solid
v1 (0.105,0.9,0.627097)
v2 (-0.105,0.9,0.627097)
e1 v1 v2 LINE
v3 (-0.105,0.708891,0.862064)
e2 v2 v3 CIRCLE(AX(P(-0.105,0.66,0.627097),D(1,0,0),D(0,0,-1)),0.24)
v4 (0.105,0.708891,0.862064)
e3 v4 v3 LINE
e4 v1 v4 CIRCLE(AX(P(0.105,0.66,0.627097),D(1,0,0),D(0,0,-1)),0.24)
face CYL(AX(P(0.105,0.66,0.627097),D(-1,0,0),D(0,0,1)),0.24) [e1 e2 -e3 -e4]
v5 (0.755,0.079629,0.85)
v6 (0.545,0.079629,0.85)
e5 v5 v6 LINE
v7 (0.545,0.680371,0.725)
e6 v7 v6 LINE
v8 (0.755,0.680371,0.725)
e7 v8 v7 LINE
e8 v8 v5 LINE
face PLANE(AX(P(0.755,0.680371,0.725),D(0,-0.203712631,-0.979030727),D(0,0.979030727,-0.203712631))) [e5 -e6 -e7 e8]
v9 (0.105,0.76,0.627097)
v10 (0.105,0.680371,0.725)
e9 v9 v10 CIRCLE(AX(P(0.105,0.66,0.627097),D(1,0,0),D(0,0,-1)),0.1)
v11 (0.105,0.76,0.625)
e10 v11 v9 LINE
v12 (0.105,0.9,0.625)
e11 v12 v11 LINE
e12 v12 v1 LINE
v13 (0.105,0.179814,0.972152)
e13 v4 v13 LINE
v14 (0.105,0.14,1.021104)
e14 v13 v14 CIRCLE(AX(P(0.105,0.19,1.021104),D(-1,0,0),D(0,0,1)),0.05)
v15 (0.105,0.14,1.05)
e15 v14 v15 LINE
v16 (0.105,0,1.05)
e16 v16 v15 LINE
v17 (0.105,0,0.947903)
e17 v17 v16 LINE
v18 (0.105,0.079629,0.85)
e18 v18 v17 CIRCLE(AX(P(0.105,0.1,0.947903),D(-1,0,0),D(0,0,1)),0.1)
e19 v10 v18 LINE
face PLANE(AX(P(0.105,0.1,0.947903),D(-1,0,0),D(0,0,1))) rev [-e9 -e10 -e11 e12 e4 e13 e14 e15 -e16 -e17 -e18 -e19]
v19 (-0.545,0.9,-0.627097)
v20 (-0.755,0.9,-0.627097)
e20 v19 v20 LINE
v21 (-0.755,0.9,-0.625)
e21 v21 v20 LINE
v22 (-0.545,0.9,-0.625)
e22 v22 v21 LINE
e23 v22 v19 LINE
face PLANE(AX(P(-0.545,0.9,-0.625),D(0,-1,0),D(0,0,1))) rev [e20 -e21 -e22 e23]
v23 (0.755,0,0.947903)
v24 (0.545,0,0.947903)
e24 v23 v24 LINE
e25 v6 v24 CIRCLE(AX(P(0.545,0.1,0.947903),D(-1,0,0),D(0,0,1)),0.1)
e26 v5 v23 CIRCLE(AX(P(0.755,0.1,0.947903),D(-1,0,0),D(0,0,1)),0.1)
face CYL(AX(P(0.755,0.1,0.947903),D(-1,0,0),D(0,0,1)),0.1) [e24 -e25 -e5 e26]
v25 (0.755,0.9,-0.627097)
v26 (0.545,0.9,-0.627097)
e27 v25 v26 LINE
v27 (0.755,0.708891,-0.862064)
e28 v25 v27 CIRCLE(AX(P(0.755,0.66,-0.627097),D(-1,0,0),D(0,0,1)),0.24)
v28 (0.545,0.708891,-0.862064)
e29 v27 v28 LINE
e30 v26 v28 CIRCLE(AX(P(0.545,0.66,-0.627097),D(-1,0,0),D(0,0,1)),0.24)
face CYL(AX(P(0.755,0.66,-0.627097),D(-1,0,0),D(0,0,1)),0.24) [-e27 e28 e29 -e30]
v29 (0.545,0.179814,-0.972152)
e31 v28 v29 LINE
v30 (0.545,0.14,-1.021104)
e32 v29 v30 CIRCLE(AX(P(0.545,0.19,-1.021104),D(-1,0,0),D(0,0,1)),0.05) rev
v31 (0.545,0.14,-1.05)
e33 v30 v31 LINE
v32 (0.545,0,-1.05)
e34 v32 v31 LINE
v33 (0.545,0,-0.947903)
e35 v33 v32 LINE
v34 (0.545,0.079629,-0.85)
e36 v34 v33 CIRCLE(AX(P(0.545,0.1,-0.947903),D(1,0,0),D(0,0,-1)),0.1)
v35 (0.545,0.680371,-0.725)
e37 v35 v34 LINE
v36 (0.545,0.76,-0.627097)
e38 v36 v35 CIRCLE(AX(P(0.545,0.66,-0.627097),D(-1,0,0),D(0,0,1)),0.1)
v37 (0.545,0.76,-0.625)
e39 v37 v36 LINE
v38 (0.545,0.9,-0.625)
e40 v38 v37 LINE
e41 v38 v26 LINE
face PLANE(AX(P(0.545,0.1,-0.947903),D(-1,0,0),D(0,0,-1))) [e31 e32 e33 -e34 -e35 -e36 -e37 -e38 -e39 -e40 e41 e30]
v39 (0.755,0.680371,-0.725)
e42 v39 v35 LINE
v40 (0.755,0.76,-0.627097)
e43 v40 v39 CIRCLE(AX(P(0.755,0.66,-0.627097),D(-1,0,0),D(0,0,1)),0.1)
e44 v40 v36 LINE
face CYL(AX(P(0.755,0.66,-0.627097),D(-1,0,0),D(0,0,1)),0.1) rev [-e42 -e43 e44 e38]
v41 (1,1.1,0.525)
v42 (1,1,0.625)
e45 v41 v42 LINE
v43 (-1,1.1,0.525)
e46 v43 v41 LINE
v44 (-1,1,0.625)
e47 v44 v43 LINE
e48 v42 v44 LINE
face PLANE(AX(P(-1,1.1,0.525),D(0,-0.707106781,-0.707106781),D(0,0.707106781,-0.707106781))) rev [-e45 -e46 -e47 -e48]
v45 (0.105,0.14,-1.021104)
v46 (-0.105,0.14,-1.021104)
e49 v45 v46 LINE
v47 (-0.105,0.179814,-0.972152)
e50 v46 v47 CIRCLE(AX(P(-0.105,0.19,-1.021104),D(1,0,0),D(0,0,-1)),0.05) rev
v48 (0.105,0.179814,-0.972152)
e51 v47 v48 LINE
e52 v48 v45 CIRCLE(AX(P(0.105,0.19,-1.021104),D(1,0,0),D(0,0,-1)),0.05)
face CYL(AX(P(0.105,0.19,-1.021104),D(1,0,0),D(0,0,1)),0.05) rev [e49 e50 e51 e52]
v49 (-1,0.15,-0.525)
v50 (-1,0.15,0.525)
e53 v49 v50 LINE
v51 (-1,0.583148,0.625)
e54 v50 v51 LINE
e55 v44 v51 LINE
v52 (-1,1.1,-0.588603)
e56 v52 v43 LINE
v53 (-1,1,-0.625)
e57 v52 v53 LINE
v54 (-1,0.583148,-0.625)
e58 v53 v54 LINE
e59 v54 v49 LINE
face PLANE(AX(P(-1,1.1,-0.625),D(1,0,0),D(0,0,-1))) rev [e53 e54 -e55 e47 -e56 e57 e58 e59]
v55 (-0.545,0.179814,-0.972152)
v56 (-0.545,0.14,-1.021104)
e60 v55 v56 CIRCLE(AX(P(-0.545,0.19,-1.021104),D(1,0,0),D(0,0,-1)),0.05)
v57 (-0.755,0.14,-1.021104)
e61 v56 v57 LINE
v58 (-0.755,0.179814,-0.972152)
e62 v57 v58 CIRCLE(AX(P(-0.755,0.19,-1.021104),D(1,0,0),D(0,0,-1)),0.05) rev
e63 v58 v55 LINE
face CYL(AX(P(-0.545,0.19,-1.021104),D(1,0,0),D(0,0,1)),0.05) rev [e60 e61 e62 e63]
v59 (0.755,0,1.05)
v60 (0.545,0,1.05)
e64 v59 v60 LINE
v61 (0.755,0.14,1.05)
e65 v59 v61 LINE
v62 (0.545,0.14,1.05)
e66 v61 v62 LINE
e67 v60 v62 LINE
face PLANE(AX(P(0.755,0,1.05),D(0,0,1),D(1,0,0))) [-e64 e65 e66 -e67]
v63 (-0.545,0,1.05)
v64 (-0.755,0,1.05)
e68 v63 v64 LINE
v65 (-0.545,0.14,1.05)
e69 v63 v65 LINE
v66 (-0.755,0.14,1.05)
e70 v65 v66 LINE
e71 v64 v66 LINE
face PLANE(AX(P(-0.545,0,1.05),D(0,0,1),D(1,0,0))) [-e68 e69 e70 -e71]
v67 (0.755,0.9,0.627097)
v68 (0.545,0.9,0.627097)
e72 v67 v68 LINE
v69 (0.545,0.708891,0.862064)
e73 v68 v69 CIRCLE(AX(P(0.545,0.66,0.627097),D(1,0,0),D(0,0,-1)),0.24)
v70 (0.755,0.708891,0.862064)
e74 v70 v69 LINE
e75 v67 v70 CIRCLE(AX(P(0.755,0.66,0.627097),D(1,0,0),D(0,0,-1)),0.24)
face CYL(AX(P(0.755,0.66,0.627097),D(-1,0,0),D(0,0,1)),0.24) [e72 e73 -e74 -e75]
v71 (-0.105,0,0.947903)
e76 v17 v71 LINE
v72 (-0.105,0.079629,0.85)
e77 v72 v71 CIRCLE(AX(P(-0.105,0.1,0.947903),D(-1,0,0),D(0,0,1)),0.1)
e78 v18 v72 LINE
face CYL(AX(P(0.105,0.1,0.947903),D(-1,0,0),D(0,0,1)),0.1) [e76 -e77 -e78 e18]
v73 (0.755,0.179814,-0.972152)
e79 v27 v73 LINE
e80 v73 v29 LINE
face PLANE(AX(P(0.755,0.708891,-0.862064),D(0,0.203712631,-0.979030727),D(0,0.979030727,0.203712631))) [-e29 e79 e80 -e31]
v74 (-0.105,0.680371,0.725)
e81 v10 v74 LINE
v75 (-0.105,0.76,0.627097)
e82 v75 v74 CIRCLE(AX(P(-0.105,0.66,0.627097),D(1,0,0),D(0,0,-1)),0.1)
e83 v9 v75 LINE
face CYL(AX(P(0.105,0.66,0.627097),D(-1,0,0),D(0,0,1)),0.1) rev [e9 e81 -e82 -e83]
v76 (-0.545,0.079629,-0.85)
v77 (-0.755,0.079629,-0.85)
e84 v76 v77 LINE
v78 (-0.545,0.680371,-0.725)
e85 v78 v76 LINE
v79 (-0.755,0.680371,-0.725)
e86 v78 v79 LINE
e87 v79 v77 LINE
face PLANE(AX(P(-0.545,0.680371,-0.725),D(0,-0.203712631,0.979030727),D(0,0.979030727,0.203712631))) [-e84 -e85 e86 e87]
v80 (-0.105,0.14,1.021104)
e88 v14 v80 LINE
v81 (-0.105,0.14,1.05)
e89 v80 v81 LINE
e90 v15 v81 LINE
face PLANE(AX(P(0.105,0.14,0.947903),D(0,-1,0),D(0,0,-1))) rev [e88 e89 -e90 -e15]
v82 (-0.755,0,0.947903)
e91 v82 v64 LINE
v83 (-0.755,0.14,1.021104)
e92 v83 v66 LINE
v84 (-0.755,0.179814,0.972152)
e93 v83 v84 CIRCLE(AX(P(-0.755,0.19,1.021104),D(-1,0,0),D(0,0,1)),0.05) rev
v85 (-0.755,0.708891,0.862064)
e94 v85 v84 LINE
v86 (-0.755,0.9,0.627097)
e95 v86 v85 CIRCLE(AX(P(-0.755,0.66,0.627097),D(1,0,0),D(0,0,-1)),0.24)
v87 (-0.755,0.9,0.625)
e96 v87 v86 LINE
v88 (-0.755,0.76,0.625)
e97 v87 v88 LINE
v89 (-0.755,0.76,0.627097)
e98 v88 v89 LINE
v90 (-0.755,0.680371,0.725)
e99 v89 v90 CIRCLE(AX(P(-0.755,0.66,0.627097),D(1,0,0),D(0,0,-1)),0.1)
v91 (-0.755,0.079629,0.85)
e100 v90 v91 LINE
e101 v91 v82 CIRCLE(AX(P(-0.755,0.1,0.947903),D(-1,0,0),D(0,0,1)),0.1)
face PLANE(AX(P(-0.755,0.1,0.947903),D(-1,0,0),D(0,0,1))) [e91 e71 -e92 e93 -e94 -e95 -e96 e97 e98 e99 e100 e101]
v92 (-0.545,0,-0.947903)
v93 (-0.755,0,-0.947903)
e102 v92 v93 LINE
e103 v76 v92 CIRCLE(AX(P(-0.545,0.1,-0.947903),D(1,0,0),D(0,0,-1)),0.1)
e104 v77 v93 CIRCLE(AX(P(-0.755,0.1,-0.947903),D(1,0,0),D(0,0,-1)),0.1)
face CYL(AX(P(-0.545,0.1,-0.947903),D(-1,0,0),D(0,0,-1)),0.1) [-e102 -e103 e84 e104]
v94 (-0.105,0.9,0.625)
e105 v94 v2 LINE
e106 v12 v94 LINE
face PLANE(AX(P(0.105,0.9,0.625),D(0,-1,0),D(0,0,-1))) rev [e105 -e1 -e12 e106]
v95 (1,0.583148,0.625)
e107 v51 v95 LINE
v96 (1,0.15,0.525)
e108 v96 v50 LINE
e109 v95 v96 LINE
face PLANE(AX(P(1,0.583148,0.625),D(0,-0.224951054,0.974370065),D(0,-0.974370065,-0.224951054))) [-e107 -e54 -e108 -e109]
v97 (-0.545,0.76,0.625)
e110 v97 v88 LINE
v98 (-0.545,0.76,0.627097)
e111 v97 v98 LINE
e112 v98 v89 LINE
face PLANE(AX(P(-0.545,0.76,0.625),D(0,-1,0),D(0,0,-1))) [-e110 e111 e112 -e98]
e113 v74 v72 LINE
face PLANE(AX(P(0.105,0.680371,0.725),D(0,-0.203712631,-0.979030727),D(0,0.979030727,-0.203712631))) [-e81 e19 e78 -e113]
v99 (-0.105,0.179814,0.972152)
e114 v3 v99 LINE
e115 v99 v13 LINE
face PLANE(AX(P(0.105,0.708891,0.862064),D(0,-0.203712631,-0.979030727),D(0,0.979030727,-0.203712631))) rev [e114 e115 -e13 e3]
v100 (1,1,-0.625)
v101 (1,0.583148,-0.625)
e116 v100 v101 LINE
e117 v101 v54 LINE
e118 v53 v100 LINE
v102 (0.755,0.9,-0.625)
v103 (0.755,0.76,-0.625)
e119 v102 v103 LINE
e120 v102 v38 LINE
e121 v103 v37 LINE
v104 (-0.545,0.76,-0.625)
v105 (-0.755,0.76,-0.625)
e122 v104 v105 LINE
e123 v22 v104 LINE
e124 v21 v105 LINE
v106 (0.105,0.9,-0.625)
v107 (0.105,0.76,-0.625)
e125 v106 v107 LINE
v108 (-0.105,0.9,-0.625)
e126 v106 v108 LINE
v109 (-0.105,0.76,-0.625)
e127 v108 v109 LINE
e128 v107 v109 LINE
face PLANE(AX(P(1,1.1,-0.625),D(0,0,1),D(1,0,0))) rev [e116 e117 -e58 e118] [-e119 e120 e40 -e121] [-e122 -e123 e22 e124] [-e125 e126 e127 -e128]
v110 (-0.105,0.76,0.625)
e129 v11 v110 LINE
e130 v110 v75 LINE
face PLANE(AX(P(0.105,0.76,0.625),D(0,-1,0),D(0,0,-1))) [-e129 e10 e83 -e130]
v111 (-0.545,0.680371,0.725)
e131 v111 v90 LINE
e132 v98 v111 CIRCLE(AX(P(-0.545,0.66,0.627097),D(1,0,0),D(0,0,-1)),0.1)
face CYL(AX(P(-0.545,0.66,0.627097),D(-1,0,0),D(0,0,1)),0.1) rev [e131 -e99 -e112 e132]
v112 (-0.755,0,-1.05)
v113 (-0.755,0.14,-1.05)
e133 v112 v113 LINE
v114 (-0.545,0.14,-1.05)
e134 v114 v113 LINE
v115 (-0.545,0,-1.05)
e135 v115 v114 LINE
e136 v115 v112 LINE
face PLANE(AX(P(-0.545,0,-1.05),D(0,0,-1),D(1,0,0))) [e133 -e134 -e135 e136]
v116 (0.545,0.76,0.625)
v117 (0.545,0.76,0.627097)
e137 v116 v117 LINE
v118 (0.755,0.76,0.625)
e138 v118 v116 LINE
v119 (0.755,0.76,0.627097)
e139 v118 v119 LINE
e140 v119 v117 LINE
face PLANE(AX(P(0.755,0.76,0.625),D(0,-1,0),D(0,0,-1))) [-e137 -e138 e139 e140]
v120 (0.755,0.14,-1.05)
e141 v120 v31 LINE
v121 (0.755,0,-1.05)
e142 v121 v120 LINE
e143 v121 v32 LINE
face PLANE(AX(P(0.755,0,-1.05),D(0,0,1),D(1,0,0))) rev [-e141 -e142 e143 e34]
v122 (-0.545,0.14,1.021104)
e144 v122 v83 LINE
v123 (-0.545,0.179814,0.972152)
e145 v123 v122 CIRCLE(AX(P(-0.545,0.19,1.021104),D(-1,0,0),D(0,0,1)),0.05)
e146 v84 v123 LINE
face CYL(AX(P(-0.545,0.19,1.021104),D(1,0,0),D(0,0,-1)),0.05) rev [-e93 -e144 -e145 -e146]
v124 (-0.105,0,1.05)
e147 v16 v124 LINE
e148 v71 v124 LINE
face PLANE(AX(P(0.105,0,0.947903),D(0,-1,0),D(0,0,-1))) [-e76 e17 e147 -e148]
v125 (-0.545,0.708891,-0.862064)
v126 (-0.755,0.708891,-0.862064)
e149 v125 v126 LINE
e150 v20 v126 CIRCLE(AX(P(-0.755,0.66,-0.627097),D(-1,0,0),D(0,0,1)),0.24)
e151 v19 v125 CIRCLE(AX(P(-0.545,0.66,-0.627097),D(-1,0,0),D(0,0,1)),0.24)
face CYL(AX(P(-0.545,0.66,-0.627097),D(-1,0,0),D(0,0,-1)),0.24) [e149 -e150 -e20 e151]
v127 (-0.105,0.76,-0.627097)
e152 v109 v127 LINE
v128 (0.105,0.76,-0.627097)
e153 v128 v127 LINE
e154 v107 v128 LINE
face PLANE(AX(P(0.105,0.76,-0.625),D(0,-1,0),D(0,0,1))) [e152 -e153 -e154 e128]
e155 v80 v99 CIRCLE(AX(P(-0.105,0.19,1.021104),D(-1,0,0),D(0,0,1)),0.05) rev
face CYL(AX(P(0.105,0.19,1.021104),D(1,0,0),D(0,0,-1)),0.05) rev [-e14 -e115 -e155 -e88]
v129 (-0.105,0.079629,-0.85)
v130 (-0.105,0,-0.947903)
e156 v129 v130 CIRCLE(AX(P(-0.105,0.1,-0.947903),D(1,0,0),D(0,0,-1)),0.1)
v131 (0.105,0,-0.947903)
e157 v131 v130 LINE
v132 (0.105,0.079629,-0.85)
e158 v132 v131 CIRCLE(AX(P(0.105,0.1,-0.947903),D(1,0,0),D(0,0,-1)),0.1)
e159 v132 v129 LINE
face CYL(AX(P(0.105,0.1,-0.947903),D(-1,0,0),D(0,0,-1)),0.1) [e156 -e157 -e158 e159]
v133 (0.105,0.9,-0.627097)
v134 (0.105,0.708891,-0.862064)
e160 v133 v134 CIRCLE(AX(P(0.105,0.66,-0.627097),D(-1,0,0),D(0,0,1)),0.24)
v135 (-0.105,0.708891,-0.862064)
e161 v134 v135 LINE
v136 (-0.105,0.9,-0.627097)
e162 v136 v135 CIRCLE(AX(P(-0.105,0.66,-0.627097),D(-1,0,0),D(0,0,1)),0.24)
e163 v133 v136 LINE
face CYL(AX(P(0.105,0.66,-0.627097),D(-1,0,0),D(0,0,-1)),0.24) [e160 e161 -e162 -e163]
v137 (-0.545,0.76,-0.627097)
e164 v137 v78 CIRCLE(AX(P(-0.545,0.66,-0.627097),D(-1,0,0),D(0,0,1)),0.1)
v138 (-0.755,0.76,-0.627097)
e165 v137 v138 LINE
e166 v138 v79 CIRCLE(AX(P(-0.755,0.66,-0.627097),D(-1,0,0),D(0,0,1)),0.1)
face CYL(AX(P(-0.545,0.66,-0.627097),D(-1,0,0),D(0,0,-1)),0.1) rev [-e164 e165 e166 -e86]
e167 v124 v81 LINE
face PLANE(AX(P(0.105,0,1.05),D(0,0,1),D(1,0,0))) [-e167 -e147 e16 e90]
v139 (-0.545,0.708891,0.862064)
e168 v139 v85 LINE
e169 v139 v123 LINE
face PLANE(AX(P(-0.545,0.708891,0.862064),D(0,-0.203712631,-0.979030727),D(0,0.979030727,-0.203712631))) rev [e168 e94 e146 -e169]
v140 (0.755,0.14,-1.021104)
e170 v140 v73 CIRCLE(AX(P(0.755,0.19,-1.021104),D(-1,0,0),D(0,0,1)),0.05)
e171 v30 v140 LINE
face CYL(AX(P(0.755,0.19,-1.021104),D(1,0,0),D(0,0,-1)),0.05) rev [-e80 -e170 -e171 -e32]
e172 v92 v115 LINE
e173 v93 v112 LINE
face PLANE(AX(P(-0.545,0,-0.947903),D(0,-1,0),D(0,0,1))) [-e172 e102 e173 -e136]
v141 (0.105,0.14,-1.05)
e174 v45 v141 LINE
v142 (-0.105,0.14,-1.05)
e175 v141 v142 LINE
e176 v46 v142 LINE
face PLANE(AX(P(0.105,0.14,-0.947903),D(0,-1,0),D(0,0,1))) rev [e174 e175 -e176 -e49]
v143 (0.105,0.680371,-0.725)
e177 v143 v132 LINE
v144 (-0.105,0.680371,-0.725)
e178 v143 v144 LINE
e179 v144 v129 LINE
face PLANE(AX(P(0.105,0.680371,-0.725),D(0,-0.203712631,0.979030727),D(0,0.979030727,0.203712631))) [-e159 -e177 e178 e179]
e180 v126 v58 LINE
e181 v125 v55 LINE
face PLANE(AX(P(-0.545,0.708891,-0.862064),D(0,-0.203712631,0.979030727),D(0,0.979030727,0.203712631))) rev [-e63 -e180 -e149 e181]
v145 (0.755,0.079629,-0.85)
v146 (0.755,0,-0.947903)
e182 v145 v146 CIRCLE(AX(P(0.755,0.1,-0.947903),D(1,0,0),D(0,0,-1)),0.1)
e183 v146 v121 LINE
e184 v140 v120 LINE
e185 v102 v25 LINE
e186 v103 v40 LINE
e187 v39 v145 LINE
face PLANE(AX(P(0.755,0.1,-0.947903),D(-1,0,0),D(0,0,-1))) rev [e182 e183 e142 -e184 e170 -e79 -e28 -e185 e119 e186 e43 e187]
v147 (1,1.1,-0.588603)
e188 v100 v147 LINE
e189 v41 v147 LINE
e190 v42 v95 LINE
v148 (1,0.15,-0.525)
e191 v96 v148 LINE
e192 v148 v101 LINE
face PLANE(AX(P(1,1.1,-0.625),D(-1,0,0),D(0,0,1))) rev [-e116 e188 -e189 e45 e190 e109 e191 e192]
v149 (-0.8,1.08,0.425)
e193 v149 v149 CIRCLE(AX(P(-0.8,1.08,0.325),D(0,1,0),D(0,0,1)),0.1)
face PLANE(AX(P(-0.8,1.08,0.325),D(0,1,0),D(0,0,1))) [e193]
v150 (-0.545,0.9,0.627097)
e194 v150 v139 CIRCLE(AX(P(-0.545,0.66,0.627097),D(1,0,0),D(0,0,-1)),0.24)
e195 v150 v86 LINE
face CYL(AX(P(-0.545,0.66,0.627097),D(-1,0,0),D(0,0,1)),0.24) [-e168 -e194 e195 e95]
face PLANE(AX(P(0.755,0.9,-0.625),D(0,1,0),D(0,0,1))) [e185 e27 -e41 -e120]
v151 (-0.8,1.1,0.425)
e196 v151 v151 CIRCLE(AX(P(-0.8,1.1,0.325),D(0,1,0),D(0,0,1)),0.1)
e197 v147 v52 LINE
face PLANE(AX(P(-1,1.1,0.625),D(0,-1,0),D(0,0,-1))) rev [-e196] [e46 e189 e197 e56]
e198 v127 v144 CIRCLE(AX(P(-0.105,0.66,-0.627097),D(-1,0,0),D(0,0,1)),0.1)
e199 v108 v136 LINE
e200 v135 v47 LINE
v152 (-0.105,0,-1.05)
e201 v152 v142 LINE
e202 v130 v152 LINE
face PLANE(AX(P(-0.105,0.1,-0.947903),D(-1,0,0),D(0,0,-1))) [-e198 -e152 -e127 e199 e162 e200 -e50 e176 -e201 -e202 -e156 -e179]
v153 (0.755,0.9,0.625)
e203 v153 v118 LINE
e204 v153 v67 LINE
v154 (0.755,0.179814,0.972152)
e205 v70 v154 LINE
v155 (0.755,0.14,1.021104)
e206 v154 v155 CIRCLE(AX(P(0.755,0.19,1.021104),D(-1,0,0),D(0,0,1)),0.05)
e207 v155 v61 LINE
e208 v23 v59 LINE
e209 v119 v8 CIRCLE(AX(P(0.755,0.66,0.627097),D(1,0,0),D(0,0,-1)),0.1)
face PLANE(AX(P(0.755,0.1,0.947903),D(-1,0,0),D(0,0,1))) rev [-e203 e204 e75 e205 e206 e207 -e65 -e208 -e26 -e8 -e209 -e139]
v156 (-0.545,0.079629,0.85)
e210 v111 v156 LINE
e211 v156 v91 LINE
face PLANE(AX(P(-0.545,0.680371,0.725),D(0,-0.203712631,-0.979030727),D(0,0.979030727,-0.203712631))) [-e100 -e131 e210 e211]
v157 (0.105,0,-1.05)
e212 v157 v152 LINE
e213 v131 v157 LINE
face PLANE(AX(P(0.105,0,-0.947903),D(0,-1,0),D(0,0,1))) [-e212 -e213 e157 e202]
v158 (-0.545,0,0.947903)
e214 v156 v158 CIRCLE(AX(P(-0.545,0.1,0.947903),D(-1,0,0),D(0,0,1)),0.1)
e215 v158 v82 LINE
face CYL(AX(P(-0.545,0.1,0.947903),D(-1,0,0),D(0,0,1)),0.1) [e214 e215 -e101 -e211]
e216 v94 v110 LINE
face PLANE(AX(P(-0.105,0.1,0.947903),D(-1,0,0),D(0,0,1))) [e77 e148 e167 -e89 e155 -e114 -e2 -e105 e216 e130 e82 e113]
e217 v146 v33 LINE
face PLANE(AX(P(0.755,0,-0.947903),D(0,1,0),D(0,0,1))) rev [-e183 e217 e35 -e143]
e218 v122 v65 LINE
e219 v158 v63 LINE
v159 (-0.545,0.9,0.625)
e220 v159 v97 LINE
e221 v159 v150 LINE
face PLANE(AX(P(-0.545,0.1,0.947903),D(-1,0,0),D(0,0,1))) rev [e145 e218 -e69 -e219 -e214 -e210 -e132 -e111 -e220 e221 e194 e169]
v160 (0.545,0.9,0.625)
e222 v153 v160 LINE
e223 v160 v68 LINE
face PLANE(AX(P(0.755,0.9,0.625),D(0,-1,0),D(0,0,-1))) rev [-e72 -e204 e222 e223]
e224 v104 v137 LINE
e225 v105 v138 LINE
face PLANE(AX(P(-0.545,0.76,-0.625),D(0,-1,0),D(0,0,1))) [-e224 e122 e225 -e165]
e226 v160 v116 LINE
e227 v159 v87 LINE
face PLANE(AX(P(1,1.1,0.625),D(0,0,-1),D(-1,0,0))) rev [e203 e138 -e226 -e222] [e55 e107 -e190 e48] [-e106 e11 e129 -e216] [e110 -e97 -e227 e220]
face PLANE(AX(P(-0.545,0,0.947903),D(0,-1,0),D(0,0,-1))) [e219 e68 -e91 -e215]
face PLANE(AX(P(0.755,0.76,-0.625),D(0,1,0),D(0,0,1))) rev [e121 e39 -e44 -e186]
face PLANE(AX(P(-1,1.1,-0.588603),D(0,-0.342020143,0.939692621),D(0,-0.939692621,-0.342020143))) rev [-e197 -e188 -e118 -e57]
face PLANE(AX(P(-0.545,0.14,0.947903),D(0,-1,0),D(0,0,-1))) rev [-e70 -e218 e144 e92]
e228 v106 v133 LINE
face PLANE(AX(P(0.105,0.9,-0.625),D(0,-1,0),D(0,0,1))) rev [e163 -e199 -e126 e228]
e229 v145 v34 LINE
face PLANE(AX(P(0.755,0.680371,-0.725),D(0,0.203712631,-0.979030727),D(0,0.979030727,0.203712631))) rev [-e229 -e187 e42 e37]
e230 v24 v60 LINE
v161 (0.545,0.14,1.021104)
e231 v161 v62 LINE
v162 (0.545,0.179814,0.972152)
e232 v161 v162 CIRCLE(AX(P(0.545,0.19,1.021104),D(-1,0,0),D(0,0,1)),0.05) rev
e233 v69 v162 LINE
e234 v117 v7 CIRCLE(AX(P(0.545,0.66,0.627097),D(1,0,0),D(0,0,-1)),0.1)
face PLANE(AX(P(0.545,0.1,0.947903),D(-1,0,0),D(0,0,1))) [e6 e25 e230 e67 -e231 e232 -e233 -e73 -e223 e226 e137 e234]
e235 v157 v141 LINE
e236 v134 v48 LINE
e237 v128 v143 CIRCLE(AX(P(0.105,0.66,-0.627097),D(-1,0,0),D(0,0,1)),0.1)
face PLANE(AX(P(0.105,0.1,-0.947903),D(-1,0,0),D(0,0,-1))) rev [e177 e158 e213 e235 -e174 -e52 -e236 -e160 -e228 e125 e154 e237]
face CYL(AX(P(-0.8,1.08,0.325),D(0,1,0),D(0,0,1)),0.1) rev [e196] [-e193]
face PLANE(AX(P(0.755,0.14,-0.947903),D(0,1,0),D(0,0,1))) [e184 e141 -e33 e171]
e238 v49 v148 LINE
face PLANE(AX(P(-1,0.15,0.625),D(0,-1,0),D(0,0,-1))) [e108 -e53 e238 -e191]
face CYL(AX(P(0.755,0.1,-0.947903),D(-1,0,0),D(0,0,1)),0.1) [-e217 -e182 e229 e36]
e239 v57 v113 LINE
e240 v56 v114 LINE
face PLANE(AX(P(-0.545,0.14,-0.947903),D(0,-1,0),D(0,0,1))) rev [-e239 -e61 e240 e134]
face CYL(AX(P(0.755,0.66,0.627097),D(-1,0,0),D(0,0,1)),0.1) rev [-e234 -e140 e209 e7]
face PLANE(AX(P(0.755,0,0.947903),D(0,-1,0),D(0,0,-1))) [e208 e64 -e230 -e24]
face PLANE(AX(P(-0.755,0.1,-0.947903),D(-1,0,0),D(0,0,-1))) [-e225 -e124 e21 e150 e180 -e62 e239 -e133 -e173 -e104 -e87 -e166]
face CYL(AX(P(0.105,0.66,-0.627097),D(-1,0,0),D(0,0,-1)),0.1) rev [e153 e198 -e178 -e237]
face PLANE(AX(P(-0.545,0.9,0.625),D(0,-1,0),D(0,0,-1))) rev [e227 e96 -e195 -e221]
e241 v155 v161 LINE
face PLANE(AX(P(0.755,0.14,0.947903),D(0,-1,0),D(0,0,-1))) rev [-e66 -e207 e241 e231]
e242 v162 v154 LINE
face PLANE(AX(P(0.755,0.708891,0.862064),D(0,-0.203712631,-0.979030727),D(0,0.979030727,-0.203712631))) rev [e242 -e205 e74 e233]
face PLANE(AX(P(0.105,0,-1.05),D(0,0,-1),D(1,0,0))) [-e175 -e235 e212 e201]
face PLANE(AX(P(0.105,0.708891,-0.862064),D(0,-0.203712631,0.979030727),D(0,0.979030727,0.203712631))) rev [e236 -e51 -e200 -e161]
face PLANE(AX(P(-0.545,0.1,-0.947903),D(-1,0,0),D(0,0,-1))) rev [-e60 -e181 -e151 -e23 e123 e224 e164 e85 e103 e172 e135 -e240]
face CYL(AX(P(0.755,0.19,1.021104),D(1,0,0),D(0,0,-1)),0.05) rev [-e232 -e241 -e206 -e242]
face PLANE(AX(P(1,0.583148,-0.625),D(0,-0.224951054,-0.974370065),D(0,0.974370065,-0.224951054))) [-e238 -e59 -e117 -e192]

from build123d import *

# Parameters (mm, degrees)
SKETCH_2_W                     = 2
SKETCH_2_H                     = 1.25
EXTRUDE_1_DEPTH                = 0.95
EXTRUDE_2_DEPTH                = 0.105
FILLET_1_R                     = 0.05
CHAMFER_1_SIZE                 = 0.1
PATTERN_LINEAR_2_COUNT         = 3
PATTERN_LINEAR_2_PITCH         = 0.65
FILLET_1_OF_PATTERN_LINEAR_2_R = 0.05
MIRROR_START                   = -0.755
MIRROR_1_DEPTH                 = 0.21
MIRROR_START_2                 = -0.105
MIRROR_1_2_DEPTH               = 0.21
MIRROR_START_3                 = 0.545
MIRROR_1_3_DEPTH               = 0.21
CHAMFER_2_SIZE                 = 0.1
CHAMFER_2_SIZE2                = 0.036397023
CHAMFER_3_SIZE                 = 0.1
CHAMFER_3_SIZE2                = 0.433147587
CHAMFER_4_SIZE                 = 0.1
CHAMFER_4_SIZE2                = 0.433147587
SKETCH_7_R                     = 0.1
CUT_EXTRUDE_2_DEPTH            = 0.02


# Read off the part's stored shape, not the designer's step: Зеркальное отражение1
with BuildPart() as part:
    # Эскиз2 → Бобышка-Вытянуть1 (new body)
    with BuildSketch(Plane(origin=(0, 0.15, 0), x_dir=(-1, 0, 0), z_dir=(0, 1, 0))):
        Rectangle(SKETCH_2_W, SKETCH_2_H)
    extrude(amount=EXTRUDE_1_DEPTH)

    # Эскиз4 → Вытянуть-Тонкостенный2 (add, symmetric)
    with BuildSketch(Plane(origin=(0.65, 0, 0), x_dir=(0, 0, -1), z_dir=(1, 0, 0))):
        with BuildLine():
            Line((-0.625, 0.76), (-0.627096927, 0.76))
            ThreePointArc((-0.627096927, 0.76), (-0.690195555, 0.737579399), (-0.725, 0.680371263))
            Line((-0.725, 0.680371263), (-0.85, 0.079628737))
            ThreePointArc((-0.85, 0.079628737), (-0.884804445, 0.022420601), (-0.947903073, 0))
            Line((-0.947903073, 0), (-1.05, 0))
            Line((-1.05, 0), (-1.05, 0.14))
            Line((-1.05, 0.14), (-0.980436776, 0.14))
            Line((-0.980436776, 0.14), (-0.862064302, 0.708891032))
            ThreePointArc((-0.862064302, 0.708891032), (-0.778533634, 0.846190558), (-0.627096927, 0.9))
            Line((-0.627096927, 0.9), (-0.625, 0.9))
            Line((-0.625, 0.9), (-0.625, 0.76))
        make_face()
    extrude_2 = extrude(amount=EXTRUDE_2_DEPTH, both=True)

    # Скругление1
    fillet_1_edges = [part.edges().sort_by_distance(p)[0] for p in [
        (0.65, 0.14, 0.980436776),
    ]]
    fillet(fillet_1_edges, radius=FILLET_1_R)

    # Фаска1
    chamfer_1_edges = [part.edges().sort_by_distance(p)[0] for p in [
        (0, 1.1, 0.625),
    ]]
    chamfer(chamfer_1_edges, length=CHAMFER_1_SIZE)

    # Линейный массив2: Вытянуть-Тонкостенный2 ×3
    with Locations(*[(-i * PATTERN_LINEAR_2_PITCH, 0, 0) for i in range(1, PATTERN_LINEAR_2_COUNT)]):
        add(extrude_2)

    # Скругление1 of Линейный массив2
    fillet_1_of_pattern_linear_2_edges = [part.edges().sort_by_distance(p)[0] for p in [
        (0, 0.14, 0.980436776),
        (-0.65, 0.14, 0.980436776),
    ]]
    fillet(fillet_1_of_pattern_linear_2_edges, radius=FILLET_1_OF_PATTERN_LINEAR_2_R)

    # Зеркальное отражение1 outline → Зеркальное отражение1 (add)
    with BuildSketch(Plane.YZ.offset(MIRROR_START)):
        with BuildLine():
            Line((0, -1.05), (0.14, -1.05))
            Line((0.14, -1.05), (0.14, -1.021103904))
            ThreePointArc((0.14, -1.021103904), (0.1512103, -0.98955459), (0.179814368, -0.972152368))
            Line((0.179814368, -0.972152368), (0.708891032, -0.862064302))
            ThreePointArc((0.708891032, -0.862064302), (0.846190558, -0.778533634), (0.9, -0.627096927))
            Line((0.9, -0.627096927), (0.9, -0.625))
            Line((0.9, -0.625), (0.76, -0.625))
            Line((0.76, -0.625), (0.76, -0.627096927))
            ThreePointArc((0.76, -0.627096927), (0.737579399, -0.690195555), (0.680371263, -0.725))
            Line((0.680371263, -0.725), (0.079628737, -0.85))
            ThreePointArc((0.079628737, -0.85), (0.022420601, -0.884804445), (0, -0.947903073))
            Line((0, -0.947903073), (0, -1.05))
        make_face()
    extrude(amount=MIRROR_1_DEPTH)

    # Mirror 1 2 outline → Mirror 1 2 (add)
    with BuildSketch(Plane.YZ.offset(MIRROR_START_2)):
        with BuildLine():
            Line((0, -1.05), (0.14, -1.05))
            Line((0.14, -1.05), (0.14, -1.021103904))
            ThreePointArc((0.14, -1.021103904), (0.1512103, -0.98955459), (0.179814368, -0.972152368))
            Line((0.179814368, -0.972152368), (0.708891032, -0.862064302))
            ThreePointArc((0.708891032, -0.862064302), (0.846190558, -0.778533634), (0.9, -0.627096927))
            Line((0.9, -0.627096927), (0.9, -0.625))
            Line((0.9, -0.625), (0.76, -0.625))
            Line((0.76, -0.625), (0.76, -0.627096927))
            ThreePointArc((0.76, -0.627096927), (0.737579399, -0.690195555), (0.680371263, -0.725))
            Line((0.680371263, -0.725), (0.079628737, -0.85))
            ThreePointArc((0.079628737, -0.85), (0.022420601, -0.884804445), (0, -0.947903073))
            Line((0, -0.947903073), (0, -1.05))
        make_face()
    extrude(amount=MIRROR_1_2_DEPTH)

    # Mirror 1 3 outline → Mirror 1 3 (add)
    with BuildSketch(Plane.YZ.offset(MIRROR_START_3)):
        with BuildLine():
            Line((0, -1.05), (0.14, -1.05))
            Line((0.14, -1.05), (0.14, -1.021103904))
            ThreePointArc((0.14, -1.021103904), (0.1512103, -0.98955459), (0.179814368, -0.972152368))
            Line((0.179814368, -0.972152368), (0.708891032, -0.862064302))
            ThreePointArc((0.708891032, -0.862064302), (0.846190558, -0.778533634), (0.9, -0.627096927))
            Line((0.9, -0.627096927), (0.9, -0.625))
            Line((0.9, -0.625), (0.76, -0.625))
            Line((0.76, -0.625), (0.76, -0.627096927))
            ThreePointArc((0.76, -0.627096927), (0.737579399, -0.690195555), (0.680371263, -0.725))
            Line((0.680371263, -0.725), (0.079628737, -0.85))
            ThreePointArc((0.079628737, -0.85), (0.022420601, -0.884804445), (0, -0.947903073))
            Line((0, -0.947903073), (0, -1.05))
        make_face()
    extrude(amount=MIRROR_1_3_DEPTH)

    # Фаска2
    chamfer_2_edges = [part.edges().sort_by_distance(p)[0] for p in [
        (0, 1.1, -0.625),
    ]]
    chamfer_2_side = [part.faces().sort_by_distance(p)[0] for p in [
        (0, 0.615020422, -0.625),
    ]]
    chamfer(chamfer_2_edges, length=CHAMFER_2_SIZE, length2=CHAMFER_2_SIZE2, reference=chamfer_2_side[0])

    # Фаска3
    chamfer_3_edges = [part.edges().sort_by_distance(p)[0] for p in [
        (0, 0.15, -0.625),
    ]]
    chamfer_3_side = [part.faces().sort_by_distance(p)[0] for p in [
        (0, 0.15, 0),
    ]]
    chamfer(chamfer_3_edges, length=CHAMFER_3_SIZE, length2=CHAMFER_3_SIZE2, reference=chamfer_3_side[0])

    # Фаска4
    chamfer_4_edges = [part.edges().sort_by_distance(p)[0] for p in [
        (0, 0.15, 0.625),
    ]]
    chamfer_4_side = [part.faces().sort_by_distance(p)[0] for p in [
        (0, 0.15, 0.05),
    ]]
    chamfer(chamfer_4_edges, length=CHAMFER_4_SIZE, length2=CHAMFER_4_SIZE2, reference=chamfer_4_side[0])

    # Эскиз7 → Вырез-Вытянуть2 (cut)
    with BuildSketch(Plane(origin=(0, 1.1, 0), x_dir=(1, 0, 0), z_dir=(0, 1, 0))):
        with Locations(Location((-0.8, -0.325, 0), (0, 0, 270))):
            Circle(SKETCH_7_R)
    extrude(amount=-CUT_EXTRUDE_2_DEPTH, mode=Mode.SUBTRACT)


solid = part.part
